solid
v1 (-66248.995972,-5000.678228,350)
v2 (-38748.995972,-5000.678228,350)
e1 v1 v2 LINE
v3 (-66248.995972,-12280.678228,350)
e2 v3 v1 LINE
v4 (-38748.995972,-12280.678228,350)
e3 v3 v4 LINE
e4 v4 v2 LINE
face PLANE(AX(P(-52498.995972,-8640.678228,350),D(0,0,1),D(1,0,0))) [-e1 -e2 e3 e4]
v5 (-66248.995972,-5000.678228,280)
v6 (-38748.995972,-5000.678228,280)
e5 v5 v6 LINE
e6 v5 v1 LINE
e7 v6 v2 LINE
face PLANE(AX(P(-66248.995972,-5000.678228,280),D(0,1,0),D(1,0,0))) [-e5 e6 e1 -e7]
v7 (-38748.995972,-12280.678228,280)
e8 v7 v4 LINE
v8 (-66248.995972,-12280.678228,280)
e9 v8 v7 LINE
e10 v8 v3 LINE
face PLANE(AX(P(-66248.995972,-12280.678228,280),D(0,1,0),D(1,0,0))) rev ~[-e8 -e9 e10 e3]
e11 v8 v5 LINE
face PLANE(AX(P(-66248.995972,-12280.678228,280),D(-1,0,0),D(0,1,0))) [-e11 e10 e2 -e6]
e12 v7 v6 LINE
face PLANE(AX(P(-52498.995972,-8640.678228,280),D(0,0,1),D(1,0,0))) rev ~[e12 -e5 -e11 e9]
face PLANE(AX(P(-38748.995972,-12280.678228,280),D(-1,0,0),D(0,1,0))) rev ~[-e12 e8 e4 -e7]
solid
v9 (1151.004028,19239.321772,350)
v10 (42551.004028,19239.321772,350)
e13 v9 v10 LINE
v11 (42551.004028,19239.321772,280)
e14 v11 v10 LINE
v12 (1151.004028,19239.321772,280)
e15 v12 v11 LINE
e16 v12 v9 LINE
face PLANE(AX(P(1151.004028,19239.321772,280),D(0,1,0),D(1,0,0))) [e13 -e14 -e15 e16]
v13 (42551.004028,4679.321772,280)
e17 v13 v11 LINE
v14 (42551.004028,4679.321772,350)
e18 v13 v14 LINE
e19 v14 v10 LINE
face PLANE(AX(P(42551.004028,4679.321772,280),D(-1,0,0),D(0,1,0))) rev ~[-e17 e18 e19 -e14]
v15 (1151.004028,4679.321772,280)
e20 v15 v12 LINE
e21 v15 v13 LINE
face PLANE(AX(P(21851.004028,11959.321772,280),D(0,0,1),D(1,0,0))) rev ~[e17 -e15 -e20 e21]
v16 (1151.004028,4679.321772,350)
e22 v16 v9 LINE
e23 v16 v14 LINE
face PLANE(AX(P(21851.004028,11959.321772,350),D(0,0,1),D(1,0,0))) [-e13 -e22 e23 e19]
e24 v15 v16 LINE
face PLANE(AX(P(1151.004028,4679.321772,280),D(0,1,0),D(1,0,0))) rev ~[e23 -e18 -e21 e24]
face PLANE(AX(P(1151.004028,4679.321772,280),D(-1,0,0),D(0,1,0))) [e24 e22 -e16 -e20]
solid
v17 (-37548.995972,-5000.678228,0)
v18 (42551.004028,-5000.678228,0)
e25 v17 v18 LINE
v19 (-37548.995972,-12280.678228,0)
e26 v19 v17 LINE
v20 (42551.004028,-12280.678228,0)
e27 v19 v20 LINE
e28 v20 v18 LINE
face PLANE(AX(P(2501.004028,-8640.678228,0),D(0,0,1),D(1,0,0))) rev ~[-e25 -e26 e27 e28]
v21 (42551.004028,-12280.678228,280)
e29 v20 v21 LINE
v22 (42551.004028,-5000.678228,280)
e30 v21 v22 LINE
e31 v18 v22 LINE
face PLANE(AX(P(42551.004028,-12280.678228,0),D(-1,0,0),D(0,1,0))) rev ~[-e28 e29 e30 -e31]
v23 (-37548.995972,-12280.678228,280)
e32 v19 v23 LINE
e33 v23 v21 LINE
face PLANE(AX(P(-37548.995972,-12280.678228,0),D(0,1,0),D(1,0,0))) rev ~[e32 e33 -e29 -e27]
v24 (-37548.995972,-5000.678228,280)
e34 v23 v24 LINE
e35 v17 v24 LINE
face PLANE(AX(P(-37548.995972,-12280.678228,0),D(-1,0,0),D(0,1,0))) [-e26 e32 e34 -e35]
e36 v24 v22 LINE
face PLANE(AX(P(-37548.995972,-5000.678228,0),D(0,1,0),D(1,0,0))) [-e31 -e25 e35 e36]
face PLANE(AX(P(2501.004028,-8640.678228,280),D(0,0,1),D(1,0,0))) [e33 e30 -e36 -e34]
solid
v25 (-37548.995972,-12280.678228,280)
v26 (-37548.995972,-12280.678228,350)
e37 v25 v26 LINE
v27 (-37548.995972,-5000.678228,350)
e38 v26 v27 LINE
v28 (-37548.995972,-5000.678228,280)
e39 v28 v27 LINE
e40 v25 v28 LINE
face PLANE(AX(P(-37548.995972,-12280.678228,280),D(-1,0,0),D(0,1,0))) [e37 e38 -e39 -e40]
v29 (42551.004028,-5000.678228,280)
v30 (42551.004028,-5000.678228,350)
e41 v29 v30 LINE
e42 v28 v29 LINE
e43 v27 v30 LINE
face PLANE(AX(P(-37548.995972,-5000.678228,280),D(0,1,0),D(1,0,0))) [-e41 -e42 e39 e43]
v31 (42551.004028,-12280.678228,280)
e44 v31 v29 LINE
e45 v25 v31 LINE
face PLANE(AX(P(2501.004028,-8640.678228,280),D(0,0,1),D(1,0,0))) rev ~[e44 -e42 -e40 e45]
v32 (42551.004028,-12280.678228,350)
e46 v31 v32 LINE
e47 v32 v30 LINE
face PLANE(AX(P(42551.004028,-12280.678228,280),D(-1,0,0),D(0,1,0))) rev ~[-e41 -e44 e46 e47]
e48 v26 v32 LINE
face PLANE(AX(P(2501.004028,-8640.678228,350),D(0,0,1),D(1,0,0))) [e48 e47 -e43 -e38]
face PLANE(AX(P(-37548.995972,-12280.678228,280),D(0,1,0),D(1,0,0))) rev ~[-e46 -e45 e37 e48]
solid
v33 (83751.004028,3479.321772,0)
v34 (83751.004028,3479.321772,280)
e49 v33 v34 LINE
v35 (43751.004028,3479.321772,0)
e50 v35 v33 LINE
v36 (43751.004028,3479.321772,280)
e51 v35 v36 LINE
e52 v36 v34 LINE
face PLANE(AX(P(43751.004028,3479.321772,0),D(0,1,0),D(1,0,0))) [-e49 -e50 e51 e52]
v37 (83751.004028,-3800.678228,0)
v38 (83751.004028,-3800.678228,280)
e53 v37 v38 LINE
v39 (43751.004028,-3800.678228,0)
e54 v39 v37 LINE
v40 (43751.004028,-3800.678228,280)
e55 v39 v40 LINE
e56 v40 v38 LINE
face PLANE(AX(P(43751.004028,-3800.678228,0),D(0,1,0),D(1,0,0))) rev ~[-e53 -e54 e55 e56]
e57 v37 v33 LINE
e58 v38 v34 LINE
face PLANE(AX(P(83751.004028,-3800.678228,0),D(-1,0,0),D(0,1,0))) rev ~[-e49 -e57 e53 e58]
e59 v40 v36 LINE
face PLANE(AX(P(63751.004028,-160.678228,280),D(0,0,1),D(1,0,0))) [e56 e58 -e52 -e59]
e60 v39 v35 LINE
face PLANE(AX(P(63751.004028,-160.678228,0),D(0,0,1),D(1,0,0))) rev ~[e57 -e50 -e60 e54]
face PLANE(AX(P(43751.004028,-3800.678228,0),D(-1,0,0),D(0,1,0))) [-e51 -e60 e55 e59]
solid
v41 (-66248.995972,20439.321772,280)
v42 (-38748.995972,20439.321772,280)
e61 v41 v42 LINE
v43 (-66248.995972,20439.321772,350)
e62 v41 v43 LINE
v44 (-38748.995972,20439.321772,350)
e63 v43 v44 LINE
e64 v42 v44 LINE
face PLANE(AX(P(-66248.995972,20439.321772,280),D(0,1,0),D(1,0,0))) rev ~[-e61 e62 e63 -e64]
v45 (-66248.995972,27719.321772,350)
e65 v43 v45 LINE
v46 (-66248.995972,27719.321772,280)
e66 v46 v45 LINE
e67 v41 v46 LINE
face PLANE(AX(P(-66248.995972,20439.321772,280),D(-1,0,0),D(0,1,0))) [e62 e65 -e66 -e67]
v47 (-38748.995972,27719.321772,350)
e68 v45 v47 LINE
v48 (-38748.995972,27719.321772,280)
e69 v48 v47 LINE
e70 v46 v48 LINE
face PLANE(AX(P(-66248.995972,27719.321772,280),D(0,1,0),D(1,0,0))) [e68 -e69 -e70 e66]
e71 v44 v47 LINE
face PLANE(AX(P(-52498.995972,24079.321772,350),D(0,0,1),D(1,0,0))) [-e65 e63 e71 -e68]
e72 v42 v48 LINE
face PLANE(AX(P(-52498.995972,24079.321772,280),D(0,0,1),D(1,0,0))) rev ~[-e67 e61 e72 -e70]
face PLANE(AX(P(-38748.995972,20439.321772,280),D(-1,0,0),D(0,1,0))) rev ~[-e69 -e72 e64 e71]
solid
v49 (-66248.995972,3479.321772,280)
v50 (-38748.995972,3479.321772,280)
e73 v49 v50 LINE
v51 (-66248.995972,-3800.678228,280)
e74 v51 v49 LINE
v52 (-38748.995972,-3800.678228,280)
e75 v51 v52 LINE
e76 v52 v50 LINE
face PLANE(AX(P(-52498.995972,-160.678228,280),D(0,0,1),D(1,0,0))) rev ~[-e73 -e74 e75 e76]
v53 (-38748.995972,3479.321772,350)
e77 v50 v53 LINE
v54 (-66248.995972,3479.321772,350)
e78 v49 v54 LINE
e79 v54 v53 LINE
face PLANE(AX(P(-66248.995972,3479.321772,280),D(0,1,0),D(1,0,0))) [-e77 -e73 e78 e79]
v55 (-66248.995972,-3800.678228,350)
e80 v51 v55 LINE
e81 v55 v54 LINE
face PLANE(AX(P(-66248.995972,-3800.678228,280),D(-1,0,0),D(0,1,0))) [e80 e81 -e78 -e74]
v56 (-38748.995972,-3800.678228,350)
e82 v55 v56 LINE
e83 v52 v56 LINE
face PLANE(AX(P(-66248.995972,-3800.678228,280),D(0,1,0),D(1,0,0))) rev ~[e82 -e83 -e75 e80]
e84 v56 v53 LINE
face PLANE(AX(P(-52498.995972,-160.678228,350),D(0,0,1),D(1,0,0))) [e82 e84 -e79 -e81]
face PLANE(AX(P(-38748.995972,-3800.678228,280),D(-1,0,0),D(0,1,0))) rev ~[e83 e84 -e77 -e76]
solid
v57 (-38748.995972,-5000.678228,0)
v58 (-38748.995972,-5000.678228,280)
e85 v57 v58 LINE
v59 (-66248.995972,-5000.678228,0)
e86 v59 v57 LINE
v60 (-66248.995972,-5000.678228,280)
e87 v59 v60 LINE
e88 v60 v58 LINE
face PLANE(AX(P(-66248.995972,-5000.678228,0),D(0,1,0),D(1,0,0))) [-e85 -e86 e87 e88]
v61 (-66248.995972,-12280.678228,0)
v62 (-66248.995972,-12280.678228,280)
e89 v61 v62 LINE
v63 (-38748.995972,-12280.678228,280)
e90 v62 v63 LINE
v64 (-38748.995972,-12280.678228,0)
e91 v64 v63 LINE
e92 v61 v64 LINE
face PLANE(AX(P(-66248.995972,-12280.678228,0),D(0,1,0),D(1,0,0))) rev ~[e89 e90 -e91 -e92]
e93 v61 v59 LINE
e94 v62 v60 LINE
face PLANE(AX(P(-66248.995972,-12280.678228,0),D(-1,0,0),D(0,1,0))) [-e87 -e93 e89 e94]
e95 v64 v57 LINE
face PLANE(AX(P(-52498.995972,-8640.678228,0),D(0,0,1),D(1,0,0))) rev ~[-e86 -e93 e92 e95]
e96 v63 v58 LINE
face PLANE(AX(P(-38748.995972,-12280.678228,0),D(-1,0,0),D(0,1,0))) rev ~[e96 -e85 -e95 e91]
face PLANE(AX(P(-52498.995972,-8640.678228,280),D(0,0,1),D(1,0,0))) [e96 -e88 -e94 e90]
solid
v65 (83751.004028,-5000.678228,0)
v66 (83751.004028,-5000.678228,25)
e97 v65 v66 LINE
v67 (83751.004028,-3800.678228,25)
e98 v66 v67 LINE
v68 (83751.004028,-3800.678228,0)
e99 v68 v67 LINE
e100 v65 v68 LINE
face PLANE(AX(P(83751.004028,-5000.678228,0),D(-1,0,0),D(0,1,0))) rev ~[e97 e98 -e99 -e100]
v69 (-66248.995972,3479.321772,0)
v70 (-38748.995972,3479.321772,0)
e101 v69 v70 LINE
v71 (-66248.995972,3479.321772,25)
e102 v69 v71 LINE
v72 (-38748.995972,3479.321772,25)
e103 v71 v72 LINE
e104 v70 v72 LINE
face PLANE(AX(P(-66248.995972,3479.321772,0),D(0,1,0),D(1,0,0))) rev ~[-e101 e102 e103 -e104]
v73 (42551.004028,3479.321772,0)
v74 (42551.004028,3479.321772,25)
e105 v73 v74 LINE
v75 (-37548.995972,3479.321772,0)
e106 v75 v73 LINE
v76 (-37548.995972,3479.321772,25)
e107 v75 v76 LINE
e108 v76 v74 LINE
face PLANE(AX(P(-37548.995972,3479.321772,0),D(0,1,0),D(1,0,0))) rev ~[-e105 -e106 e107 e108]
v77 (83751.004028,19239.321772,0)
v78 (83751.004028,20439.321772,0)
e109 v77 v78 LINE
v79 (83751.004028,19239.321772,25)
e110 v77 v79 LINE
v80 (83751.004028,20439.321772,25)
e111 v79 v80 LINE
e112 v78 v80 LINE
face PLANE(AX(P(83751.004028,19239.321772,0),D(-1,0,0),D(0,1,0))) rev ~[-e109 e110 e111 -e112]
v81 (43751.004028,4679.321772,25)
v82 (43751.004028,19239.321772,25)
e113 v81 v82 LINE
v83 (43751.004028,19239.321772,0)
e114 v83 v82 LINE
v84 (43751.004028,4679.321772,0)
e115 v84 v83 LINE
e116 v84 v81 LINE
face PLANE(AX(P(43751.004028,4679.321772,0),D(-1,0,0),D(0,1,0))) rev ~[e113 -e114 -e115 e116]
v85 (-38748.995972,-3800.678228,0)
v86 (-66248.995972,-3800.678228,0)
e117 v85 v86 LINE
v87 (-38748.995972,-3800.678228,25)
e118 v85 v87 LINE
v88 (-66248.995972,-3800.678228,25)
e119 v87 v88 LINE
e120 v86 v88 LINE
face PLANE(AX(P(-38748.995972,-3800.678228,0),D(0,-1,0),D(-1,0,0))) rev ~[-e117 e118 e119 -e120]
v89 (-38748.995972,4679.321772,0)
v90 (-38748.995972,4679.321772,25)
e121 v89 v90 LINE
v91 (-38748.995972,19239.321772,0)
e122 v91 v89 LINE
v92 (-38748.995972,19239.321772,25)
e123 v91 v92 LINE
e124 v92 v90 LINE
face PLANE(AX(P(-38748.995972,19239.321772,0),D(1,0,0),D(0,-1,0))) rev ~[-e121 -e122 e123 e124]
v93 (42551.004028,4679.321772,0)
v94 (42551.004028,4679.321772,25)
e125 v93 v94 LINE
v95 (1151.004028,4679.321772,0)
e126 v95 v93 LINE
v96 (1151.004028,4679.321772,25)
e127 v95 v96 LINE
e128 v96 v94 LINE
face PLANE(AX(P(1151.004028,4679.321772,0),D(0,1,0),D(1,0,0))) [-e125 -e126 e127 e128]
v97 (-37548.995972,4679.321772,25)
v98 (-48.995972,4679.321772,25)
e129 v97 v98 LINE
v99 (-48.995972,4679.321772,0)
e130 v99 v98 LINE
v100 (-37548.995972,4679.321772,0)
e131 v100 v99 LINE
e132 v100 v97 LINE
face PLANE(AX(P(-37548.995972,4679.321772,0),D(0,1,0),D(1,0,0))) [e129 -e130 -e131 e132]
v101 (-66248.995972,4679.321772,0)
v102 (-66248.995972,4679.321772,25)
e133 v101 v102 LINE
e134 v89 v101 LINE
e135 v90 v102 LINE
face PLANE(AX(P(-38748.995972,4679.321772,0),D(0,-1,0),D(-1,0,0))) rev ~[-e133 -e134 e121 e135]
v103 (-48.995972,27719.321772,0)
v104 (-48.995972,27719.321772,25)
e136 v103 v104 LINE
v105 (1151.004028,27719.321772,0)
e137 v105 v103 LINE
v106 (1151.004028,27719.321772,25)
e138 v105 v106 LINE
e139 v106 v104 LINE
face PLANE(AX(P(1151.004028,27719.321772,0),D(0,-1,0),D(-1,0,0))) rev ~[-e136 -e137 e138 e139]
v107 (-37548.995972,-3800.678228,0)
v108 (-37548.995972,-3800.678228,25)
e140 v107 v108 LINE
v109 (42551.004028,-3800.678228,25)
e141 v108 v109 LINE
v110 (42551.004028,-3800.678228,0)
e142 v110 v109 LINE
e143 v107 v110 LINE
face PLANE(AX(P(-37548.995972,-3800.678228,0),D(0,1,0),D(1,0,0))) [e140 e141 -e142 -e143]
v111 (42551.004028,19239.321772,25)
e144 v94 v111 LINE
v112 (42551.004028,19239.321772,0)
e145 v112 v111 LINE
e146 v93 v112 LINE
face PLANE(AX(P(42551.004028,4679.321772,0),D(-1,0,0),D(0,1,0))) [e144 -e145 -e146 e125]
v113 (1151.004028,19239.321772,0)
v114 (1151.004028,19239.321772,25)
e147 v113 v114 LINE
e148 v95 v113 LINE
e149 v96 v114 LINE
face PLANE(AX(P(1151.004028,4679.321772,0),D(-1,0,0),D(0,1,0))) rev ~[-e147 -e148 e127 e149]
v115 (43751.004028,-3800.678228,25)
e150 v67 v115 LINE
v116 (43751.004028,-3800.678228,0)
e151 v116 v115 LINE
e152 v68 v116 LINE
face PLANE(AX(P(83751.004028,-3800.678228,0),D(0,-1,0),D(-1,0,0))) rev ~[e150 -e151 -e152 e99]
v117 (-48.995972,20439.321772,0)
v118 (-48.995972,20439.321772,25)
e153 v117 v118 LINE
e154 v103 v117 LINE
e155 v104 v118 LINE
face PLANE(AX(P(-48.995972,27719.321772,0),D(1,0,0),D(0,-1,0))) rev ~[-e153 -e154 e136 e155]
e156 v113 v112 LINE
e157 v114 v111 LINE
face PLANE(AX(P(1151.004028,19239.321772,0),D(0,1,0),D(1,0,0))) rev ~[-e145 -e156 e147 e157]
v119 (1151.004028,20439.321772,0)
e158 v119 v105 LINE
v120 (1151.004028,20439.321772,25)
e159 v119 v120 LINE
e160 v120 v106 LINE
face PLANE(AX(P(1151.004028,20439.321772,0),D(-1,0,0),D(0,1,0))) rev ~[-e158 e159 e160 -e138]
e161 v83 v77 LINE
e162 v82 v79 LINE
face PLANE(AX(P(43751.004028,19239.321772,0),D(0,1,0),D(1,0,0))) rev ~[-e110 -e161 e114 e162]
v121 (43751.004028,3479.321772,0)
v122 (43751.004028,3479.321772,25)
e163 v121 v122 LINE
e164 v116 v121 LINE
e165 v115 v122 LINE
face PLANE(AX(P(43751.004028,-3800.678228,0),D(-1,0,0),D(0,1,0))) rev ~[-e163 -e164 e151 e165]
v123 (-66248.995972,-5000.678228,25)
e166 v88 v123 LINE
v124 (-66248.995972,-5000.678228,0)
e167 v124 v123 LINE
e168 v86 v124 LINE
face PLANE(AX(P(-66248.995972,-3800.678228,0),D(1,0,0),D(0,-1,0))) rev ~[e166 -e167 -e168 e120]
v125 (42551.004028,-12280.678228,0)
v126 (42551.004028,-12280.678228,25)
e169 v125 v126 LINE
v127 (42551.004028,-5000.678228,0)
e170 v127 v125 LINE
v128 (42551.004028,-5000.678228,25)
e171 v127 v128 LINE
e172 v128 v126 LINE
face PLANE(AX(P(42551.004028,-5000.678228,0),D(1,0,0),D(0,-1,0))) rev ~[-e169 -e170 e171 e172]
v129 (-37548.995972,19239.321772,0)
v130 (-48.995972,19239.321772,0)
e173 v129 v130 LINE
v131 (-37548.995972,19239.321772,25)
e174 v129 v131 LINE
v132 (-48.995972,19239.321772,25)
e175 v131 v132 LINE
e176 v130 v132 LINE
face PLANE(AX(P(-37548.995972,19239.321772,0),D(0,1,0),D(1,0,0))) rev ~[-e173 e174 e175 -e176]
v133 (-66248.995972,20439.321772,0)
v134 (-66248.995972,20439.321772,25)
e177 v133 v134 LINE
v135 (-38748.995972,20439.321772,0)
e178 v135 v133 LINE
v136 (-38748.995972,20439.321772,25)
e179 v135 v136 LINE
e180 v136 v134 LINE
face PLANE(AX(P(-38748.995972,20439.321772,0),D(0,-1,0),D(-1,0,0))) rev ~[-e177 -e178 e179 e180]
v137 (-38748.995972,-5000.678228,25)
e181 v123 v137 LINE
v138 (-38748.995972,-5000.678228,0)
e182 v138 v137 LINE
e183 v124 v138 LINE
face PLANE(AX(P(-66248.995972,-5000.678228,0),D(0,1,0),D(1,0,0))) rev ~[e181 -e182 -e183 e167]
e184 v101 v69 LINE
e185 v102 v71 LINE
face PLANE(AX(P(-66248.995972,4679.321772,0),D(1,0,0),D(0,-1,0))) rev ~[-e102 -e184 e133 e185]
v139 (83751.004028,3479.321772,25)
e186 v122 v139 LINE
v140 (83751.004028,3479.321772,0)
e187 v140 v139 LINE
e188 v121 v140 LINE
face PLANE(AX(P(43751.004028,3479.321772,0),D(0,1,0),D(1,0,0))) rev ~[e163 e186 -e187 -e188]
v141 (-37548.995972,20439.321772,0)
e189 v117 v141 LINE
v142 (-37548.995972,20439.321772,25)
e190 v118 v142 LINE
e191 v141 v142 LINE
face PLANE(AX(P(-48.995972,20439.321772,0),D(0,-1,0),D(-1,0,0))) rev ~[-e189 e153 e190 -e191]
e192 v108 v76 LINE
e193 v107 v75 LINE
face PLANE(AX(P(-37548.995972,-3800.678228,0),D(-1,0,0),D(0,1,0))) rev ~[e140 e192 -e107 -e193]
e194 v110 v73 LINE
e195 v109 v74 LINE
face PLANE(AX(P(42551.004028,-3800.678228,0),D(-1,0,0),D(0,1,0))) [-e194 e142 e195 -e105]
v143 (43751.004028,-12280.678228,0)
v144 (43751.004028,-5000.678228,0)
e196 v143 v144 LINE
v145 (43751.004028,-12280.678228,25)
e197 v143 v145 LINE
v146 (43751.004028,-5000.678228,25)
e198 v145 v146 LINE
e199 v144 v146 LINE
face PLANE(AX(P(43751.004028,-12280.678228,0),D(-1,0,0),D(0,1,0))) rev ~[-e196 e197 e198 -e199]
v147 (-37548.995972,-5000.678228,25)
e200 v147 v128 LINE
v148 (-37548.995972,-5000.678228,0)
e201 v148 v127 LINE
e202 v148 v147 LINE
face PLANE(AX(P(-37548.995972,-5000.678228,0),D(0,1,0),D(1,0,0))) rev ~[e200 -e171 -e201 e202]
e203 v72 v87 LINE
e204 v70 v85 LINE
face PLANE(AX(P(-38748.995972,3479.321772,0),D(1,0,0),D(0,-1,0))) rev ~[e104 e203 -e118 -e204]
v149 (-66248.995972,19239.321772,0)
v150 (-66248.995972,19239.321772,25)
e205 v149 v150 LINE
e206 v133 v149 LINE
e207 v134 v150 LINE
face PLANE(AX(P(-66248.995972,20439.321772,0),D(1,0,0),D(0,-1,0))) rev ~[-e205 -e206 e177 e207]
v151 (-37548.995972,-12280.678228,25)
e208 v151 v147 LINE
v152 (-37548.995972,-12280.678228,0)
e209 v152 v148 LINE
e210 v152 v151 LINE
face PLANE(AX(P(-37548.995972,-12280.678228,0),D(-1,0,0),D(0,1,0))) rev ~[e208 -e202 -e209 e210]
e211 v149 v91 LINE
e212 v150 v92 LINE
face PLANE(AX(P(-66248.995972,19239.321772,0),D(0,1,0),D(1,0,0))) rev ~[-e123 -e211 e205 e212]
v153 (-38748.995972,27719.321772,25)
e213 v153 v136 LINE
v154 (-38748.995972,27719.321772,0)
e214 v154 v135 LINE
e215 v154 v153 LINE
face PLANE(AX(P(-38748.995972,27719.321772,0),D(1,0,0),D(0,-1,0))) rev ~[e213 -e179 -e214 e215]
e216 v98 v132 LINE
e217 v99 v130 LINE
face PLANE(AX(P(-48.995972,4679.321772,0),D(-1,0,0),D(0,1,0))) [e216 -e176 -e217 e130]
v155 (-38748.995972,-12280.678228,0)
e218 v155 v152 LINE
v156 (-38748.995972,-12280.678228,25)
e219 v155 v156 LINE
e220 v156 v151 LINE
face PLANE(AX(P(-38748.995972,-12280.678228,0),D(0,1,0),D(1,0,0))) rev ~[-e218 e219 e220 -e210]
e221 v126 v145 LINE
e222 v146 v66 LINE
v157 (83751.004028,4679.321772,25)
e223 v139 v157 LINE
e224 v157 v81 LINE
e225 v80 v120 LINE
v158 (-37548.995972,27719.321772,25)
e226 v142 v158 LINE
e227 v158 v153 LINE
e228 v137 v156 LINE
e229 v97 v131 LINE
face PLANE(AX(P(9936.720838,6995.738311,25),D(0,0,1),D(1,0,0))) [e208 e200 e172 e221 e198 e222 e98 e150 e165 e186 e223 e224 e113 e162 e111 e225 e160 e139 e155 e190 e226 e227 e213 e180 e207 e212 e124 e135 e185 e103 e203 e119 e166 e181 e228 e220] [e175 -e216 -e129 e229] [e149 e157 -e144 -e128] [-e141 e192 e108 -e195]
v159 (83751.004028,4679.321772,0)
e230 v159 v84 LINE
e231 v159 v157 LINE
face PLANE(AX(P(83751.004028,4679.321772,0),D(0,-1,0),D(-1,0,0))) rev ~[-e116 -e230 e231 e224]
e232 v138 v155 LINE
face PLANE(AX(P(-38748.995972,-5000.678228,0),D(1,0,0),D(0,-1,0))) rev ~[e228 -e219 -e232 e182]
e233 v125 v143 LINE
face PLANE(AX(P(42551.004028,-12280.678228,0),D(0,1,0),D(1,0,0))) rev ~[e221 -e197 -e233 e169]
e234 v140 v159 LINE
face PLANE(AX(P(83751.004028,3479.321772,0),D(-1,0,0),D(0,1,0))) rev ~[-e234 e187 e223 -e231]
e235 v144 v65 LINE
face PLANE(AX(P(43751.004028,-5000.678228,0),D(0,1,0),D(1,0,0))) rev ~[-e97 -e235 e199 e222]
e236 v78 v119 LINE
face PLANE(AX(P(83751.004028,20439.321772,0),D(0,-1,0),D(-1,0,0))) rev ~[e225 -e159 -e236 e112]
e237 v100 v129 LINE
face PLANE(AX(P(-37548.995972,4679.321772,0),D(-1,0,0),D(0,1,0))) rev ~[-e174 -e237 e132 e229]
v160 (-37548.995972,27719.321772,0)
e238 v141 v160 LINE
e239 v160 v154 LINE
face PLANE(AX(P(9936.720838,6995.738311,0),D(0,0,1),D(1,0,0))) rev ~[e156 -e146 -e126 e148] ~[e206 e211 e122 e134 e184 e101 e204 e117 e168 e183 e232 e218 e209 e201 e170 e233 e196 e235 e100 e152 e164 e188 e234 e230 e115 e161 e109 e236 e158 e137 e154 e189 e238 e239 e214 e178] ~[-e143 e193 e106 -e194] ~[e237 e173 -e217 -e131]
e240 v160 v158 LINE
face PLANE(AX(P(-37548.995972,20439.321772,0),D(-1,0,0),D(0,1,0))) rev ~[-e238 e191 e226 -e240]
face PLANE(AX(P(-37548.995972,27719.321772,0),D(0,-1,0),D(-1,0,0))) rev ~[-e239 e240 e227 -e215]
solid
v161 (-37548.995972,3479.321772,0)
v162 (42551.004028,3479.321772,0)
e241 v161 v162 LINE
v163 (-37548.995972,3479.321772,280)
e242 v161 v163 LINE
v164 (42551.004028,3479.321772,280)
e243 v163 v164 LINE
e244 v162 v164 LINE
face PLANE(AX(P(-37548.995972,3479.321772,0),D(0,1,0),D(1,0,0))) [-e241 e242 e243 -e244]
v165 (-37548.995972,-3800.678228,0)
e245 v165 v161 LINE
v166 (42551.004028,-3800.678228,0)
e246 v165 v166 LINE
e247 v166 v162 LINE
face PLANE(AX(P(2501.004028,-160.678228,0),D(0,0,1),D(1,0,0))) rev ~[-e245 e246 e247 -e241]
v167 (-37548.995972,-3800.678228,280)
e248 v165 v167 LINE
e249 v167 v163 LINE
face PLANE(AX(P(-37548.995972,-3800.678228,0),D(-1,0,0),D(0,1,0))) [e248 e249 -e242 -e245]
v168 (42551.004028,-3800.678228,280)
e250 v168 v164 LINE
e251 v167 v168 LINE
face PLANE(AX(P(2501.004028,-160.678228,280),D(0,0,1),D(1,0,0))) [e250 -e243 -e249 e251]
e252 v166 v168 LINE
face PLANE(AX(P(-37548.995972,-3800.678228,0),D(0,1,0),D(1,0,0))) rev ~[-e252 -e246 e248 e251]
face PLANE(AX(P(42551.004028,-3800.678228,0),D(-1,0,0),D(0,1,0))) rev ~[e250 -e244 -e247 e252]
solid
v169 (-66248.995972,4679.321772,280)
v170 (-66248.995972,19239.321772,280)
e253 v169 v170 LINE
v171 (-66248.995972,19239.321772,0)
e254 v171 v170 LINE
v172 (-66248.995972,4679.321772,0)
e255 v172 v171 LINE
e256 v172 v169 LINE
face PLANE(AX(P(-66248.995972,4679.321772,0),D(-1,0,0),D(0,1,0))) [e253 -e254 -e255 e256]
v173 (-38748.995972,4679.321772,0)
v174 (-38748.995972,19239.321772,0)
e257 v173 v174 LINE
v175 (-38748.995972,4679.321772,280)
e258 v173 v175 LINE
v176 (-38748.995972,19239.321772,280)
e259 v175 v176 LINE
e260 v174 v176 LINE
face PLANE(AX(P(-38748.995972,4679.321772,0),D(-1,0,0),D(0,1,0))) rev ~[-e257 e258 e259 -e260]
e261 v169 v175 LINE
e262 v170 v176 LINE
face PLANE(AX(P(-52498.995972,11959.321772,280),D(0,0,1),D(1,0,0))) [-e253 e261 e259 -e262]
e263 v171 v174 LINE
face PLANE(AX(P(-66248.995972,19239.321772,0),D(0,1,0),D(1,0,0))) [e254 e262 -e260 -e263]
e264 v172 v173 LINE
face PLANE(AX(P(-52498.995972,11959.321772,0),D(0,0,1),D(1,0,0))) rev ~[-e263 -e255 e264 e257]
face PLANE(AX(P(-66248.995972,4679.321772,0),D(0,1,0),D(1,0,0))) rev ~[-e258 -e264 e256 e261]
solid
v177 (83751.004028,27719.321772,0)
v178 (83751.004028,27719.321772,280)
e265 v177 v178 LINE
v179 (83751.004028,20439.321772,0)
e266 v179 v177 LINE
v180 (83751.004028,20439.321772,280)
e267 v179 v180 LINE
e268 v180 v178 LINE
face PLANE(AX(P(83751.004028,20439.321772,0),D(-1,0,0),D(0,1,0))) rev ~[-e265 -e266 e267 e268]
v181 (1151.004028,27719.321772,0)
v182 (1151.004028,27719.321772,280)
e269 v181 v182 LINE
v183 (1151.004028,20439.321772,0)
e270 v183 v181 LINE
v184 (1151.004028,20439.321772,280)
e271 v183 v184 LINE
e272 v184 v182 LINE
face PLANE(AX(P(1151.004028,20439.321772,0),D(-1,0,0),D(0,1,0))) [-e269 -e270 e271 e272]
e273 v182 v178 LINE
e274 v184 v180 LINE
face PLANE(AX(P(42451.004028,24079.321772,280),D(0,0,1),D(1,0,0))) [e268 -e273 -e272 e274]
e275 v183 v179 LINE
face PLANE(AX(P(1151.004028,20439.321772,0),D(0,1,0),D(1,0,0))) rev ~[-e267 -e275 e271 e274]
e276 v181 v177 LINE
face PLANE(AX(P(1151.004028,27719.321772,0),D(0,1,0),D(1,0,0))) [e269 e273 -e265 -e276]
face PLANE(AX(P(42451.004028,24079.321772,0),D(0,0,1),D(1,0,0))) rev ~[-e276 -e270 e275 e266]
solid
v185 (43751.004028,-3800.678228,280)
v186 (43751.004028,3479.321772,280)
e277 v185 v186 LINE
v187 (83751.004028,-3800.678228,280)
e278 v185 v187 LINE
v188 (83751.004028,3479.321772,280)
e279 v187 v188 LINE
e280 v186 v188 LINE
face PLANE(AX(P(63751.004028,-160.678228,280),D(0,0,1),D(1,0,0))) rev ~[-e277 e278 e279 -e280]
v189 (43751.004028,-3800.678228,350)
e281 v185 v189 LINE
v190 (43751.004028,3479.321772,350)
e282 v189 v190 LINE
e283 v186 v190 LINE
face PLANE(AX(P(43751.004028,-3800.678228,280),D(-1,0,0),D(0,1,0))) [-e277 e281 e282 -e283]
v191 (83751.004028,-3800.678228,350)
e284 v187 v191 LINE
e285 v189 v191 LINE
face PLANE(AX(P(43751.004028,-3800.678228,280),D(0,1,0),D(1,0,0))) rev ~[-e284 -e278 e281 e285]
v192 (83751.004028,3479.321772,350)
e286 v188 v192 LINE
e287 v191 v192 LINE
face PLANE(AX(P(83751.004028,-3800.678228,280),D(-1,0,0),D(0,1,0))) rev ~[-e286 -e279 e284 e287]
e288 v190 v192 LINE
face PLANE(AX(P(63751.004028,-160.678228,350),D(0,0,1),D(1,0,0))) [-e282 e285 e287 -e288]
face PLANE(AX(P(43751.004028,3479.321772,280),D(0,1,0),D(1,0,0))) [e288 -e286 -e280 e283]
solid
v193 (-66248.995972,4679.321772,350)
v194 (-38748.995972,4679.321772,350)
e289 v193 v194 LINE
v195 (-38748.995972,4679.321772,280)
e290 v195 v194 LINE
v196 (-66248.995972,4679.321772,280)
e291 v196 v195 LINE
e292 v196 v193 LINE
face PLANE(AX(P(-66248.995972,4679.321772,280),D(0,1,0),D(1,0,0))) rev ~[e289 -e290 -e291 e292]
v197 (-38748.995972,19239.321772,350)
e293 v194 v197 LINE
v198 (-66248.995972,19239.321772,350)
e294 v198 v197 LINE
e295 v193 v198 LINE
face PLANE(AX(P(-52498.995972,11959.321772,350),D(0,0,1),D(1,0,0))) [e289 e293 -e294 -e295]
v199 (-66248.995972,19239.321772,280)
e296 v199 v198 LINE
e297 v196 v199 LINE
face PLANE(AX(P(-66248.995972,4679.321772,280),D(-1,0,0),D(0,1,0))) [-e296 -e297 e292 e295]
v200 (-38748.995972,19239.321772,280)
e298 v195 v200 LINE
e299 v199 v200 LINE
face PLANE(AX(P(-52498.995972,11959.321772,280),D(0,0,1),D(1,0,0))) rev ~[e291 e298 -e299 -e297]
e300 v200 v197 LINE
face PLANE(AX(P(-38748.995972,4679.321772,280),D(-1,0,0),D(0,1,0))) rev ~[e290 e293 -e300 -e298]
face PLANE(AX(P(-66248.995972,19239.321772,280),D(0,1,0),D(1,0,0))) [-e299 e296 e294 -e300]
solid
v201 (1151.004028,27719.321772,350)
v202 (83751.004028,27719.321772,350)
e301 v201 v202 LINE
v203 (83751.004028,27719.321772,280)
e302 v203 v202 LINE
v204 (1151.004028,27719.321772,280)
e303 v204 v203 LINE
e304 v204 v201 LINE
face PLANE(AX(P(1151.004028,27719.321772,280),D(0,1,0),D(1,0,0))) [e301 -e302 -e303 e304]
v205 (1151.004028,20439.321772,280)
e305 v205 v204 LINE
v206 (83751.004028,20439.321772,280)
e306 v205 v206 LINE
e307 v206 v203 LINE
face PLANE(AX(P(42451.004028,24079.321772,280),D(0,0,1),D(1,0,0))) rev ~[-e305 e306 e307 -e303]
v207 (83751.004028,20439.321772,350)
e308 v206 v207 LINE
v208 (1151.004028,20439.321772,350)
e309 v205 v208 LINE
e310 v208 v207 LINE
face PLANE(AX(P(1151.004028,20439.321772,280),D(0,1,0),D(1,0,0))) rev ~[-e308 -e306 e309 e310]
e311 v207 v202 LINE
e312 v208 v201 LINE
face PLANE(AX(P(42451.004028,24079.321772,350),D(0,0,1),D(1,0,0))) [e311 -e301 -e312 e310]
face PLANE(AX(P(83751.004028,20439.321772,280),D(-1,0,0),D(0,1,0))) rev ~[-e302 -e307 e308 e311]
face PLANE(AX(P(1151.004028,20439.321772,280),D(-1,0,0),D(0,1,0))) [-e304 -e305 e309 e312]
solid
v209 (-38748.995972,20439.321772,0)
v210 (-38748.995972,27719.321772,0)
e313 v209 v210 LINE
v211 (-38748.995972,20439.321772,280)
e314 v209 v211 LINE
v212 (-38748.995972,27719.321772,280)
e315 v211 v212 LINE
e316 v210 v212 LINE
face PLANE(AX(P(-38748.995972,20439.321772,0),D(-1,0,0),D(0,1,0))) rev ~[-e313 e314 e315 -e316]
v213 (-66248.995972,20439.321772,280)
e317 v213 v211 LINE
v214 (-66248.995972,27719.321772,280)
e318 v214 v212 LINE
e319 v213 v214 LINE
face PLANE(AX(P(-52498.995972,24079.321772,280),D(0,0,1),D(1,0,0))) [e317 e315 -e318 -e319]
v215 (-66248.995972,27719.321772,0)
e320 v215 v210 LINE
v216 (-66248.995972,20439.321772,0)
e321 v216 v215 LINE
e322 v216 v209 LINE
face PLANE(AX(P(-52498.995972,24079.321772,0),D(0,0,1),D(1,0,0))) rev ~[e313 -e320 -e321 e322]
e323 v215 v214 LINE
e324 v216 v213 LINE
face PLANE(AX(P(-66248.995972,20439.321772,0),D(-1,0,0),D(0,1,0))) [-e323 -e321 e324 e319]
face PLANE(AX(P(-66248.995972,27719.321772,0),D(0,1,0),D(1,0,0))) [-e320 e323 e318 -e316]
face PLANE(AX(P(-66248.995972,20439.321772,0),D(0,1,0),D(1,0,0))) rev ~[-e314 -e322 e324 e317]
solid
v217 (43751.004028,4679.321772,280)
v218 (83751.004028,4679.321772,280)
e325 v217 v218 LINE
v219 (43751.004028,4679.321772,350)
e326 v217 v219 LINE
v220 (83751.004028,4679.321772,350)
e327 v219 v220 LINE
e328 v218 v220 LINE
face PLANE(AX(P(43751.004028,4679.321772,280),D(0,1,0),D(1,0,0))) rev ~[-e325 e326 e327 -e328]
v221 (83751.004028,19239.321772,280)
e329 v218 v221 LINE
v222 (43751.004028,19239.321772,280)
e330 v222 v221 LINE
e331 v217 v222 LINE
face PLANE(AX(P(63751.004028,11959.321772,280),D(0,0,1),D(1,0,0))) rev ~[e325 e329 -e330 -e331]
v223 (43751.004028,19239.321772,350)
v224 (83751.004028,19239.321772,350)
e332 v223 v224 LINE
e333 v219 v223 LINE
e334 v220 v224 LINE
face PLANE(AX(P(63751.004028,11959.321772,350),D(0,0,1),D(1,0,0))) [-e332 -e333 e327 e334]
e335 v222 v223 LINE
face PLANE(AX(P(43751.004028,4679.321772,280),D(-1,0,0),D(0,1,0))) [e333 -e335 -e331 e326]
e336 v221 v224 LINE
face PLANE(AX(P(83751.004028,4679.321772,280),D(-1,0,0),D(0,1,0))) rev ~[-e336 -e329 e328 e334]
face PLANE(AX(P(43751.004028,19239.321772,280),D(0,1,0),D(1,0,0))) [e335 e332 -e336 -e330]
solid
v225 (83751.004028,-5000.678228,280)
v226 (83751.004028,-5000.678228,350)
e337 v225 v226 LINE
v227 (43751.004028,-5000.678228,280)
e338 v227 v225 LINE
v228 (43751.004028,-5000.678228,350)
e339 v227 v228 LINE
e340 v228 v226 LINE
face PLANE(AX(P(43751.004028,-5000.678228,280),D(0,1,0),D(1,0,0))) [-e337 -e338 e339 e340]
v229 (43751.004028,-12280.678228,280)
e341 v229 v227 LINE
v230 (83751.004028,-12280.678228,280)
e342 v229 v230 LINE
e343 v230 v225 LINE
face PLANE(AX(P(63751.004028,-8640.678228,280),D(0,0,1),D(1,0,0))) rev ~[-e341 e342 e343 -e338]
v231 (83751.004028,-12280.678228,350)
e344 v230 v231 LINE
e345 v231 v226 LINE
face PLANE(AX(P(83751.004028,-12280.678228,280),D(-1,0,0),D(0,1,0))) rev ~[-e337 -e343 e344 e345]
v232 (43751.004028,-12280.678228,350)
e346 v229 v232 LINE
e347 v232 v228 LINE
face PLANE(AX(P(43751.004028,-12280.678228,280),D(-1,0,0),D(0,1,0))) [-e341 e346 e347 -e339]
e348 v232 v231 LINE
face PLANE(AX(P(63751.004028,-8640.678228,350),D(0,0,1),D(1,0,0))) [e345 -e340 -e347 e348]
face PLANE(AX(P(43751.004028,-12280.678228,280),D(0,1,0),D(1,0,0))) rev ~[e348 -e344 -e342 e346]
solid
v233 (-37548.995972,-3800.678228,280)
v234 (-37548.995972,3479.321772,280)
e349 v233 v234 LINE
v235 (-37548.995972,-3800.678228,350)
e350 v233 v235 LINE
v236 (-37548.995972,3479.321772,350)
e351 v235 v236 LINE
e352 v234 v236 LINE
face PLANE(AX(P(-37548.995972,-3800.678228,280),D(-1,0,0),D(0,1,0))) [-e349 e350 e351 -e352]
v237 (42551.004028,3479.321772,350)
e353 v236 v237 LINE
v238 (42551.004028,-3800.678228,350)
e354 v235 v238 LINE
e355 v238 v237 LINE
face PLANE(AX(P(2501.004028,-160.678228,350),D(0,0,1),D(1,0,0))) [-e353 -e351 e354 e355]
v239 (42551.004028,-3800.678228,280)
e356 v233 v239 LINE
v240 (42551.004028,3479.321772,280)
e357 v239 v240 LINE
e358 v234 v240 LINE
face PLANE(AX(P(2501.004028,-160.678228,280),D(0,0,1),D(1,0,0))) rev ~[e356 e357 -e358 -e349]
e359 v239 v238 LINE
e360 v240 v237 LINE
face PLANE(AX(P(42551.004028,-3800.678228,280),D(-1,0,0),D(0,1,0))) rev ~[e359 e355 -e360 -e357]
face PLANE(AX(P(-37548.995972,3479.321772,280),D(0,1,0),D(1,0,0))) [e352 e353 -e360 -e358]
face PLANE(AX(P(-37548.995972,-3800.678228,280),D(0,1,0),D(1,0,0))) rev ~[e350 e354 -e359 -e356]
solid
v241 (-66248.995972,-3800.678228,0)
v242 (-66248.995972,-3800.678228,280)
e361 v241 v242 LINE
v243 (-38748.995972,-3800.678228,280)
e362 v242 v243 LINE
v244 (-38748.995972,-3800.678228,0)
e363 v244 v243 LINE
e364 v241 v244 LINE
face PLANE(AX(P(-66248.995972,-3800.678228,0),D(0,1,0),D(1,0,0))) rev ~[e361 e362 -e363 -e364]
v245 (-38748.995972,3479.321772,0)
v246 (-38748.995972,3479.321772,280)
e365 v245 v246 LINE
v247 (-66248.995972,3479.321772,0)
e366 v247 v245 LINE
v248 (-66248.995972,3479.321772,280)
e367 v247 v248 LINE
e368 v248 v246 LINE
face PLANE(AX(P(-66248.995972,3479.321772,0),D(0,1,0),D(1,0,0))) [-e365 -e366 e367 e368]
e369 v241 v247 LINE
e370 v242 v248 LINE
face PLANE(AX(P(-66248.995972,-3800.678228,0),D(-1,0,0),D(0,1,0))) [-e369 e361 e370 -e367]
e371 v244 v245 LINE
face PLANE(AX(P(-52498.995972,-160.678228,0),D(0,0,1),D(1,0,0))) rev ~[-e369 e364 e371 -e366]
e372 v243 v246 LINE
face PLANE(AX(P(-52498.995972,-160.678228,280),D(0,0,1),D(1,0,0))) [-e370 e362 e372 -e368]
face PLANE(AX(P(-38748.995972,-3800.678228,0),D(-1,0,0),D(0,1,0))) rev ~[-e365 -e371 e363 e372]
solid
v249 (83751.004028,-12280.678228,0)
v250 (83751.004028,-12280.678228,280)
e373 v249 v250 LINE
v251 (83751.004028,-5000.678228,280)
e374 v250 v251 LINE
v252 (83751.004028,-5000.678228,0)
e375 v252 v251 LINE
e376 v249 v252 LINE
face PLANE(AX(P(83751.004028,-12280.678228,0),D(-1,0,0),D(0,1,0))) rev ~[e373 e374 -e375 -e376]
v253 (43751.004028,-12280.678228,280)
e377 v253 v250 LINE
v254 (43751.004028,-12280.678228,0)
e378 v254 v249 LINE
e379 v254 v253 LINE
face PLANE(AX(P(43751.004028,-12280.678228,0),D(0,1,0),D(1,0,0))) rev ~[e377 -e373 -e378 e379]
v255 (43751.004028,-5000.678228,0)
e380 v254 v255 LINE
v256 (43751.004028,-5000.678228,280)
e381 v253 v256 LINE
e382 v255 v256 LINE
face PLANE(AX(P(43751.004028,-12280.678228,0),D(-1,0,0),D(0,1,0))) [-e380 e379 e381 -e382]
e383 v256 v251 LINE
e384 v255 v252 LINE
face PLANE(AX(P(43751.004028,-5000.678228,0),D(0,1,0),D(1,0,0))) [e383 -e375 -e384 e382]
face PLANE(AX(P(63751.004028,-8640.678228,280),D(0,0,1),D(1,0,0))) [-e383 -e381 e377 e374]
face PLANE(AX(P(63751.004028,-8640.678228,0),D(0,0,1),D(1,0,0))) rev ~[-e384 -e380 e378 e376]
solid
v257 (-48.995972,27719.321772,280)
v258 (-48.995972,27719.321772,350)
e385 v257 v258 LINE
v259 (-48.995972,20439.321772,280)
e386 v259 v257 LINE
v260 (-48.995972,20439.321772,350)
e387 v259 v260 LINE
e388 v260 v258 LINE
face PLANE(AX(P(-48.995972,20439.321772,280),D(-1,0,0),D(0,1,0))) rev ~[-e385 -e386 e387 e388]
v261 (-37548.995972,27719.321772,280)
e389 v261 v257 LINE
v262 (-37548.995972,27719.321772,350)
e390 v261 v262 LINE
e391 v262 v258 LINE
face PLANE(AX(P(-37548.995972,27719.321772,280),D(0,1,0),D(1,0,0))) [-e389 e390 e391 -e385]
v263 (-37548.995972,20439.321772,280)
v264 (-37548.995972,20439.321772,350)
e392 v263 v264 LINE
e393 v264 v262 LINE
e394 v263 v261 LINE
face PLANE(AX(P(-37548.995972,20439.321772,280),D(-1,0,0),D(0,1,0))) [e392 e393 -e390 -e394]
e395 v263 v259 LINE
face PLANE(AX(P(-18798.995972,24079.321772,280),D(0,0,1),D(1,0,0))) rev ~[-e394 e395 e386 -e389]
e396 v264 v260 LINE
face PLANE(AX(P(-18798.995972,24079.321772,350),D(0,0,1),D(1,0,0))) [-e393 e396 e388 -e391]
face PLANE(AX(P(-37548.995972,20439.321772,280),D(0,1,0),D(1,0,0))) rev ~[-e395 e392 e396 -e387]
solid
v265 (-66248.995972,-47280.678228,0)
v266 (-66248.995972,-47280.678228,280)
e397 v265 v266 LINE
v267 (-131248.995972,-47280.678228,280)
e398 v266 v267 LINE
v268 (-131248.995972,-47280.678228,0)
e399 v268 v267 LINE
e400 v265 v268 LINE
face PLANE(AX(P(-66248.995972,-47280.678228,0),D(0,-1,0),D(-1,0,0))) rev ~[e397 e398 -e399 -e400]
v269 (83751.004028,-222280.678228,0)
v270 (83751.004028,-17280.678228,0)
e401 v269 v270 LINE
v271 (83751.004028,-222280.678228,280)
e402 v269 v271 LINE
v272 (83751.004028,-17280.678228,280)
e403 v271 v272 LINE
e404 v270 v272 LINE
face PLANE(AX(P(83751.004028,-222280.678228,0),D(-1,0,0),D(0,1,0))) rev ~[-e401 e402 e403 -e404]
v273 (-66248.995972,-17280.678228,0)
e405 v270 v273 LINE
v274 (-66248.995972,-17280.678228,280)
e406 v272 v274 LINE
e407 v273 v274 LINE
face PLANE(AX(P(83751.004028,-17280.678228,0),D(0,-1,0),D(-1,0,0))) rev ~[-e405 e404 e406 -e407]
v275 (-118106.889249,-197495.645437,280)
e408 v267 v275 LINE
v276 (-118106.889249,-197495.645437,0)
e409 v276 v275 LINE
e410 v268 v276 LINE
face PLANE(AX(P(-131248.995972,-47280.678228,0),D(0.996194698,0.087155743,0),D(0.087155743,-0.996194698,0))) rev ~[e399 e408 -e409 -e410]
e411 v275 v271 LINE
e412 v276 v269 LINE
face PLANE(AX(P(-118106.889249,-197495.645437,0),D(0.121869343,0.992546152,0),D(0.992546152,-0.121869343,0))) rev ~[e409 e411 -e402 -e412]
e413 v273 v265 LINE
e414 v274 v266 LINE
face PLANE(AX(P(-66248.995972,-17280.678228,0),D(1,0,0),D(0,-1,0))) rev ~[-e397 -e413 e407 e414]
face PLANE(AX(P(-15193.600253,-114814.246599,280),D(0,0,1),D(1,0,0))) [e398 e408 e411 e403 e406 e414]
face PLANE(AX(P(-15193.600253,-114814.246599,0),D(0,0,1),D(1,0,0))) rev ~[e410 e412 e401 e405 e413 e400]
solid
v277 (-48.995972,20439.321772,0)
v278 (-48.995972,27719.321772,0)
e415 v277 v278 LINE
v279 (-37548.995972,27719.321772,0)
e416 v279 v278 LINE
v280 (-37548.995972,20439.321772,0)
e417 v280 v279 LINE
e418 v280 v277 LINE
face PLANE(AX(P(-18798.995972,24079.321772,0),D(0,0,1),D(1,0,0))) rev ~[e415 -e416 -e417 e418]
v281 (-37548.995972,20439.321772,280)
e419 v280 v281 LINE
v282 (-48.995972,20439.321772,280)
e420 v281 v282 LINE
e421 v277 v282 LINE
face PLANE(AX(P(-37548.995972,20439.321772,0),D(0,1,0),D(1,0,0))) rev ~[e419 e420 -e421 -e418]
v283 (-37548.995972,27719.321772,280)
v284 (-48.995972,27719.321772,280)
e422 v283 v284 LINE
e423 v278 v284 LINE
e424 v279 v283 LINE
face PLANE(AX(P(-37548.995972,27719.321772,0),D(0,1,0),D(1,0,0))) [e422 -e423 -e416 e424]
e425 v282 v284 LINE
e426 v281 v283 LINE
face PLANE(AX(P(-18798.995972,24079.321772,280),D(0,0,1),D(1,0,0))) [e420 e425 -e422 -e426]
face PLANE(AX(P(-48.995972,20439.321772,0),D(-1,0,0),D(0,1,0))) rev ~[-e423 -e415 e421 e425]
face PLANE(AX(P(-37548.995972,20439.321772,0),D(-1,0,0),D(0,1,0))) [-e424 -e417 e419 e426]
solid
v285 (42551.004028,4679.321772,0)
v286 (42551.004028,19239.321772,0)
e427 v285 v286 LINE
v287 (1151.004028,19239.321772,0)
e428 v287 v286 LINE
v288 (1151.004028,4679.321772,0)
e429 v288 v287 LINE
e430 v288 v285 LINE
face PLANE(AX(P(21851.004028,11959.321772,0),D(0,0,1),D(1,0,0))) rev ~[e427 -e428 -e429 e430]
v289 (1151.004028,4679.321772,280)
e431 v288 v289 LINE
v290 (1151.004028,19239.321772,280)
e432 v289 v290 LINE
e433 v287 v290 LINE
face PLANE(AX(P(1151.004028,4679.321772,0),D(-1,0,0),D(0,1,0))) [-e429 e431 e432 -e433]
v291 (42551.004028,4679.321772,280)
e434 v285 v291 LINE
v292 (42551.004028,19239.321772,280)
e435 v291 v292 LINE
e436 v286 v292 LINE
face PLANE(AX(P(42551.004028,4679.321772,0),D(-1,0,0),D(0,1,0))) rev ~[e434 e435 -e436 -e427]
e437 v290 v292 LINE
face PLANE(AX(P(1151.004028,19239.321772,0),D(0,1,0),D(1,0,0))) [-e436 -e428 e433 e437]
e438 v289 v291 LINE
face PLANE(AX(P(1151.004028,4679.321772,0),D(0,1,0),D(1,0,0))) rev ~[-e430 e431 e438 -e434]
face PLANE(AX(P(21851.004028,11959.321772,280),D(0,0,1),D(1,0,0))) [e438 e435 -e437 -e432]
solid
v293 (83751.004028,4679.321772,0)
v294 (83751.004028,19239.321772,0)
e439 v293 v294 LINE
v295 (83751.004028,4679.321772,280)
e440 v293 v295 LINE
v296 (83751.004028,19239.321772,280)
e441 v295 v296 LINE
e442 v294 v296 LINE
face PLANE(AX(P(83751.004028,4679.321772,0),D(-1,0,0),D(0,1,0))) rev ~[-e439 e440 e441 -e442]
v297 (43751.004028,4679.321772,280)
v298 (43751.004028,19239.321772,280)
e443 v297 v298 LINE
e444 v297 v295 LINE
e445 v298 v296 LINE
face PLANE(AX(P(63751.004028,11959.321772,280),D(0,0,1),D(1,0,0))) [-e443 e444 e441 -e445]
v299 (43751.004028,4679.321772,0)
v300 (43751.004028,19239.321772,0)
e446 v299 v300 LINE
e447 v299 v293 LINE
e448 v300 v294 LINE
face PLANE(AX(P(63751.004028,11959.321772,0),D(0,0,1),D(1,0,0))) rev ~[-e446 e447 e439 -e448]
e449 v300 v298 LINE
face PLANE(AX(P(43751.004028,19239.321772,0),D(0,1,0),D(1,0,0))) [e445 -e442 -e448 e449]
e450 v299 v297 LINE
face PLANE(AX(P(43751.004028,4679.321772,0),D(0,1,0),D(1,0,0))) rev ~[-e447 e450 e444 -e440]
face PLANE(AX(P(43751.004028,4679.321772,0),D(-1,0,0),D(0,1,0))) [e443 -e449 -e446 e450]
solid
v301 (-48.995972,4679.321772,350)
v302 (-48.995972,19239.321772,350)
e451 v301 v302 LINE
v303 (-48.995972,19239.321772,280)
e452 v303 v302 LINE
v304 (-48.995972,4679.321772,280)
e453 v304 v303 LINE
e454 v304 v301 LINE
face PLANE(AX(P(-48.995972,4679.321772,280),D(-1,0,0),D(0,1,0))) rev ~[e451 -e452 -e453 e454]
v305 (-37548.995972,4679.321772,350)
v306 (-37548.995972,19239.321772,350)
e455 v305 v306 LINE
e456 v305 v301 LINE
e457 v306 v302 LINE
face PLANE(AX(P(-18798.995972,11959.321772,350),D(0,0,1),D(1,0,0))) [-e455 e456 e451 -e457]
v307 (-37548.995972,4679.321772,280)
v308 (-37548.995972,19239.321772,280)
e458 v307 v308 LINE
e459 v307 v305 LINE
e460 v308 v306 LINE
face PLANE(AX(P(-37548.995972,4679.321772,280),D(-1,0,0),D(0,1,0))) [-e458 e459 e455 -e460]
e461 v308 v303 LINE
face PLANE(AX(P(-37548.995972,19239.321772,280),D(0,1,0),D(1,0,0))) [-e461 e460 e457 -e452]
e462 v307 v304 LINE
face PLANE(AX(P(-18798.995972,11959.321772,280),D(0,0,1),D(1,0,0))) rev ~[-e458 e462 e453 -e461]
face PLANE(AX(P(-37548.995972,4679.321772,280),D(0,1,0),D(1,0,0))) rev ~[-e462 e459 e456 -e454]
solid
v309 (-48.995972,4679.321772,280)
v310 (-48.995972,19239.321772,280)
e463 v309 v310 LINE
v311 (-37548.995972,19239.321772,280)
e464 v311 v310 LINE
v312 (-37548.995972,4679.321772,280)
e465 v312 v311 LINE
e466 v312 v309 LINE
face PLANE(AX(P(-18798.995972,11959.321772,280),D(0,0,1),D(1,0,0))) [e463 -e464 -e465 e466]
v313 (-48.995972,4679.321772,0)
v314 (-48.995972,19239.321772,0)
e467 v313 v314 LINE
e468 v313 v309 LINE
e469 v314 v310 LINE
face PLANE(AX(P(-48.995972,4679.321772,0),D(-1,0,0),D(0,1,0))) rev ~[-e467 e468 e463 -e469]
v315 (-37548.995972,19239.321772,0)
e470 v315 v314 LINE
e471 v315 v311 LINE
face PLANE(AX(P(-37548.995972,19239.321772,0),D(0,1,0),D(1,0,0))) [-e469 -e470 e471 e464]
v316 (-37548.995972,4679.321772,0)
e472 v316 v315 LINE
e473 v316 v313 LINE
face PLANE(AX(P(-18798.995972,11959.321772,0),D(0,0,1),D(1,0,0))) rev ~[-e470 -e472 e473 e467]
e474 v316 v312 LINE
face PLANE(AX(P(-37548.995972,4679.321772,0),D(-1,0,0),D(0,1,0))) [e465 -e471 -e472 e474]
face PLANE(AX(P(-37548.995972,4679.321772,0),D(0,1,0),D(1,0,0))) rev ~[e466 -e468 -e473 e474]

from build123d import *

# Parameters (mm, degrees)
F0_W     = 80100
F0_H     = 7280
F0_W_2   = 37500
F0_H_2   = 14560
F0_W_3   = 41400
F3_DEPTH = 25
F4_START = 280
F0_W_4   = 27500
F4_DEPTH = 70
F0_W_5   = 40000
F5_START = 280
F5_DEPTH = 70
F6_START = 280
F6_DEPTH = 70
F0_W_6   = 82600
F7_START = 280
F7_DEPTH = 70
F8_DEPTH = 280
F9_DEPTH = 280


# Not quite as in the source:
# - a feature names something its author has since deleted; it is built from what else it names


with BuildPart() as f3:
    # F0 (on Top) → F3 (new body)
    with BuildSketch(Plane.XY):
        Polygon((1151.0040283203, 20439.3217722573), (1151.0040283203, 27719.3217722572), (-48.9959716797, 27719.3217722572), (-48.9959716797, 20439.3217722573), (-37548.9959716797, 20439.3217722573), (-37548.9959716797, 27719.3217722572), (-38748.9959716797, 27719.3217722572), (-38748.9959716797, 20439.3217722573), (-66248.9959716797, 20439.3217722573), (-66248.9959716797, 19239.3217722572), (-38748.9959716797, 19239.3217722572), (-38748.9959716797, 4679.3217722572), (-66248.9959716797, 4679.3217722572), (-66248.9959716797, 3479.3217722572), (-38748.9959716797, 3479.3217722572), (-38748.9959716797, -3800.6782277428), (-66248.9959716797, -3800.6782277428), (-66248.9959716797, -5000.6782277428), (-38748.9959716797, -5000.6782277428), (-38748.9959716797, -12280.6782277428), (-37548.9959716797, -12280.6782277428), (-37548.9959716797, -5000.6782277428), (42551.0040283203, -5000.6782277428), (42551.0040283203, -12280.6782277428), (43751.0040283203, -12280.6782277428), (43751.0040283203, -5000.6782277428), (83751.0040283203, -5000.6782277428), (83751.0040283203, -3800.6782277427), (43751.0040283203, -3800.6782277427), (43751.0040283203, 3479.3217722572), (83751.0040283203, 3479.3217722572), (83751.0040283203, 4679.3217722573), (43751.0040283203, 4679.3217722573), (43751.0040283203, 19239.3217722572), (83751.0040283203, 19239.3217722573), (83751.0040283203, 20439.3217722573), align=None)
        with Locations((2501.0040283203, -160.6782277428)):
            Rectangle(F0_W, F0_H, mode=Mode.SUBTRACT)
        with Locations((-18798.9959716797, 11959.3217722572)):
            Rectangle(F0_W_2, F0_H_2, mode=Mode.SUBTRACT)
        with Locations((21851.0040283203, 11959.3217722572)):
            Rectangle(F0_W_3, F0_H_2, mode=Mode.SUBTRACT)
    extrude(amount=F3_DEPTH)


with BuildPart() as f4:
    # F0 (on Top) → F4 (new body)
    with BuildSketch(Plane.XY.offset(F4_START)):
        with Locations((-52498.9959716797, -8640.6782277428)):
            Rectangle(F0_W_4, F0_H)
    extrude(amount=F4_DEPTH)


with BuildPart() as f4b:
    # F0 (on Top) → F4, piece 2 (new body)
    with BuildSketch(Plane.XY.offset(F4_START)):
        with Locations((-18798.9959716797, 24079.3217722572)):
            Rectangle(F0_W_2, F0_H)
    extrude(amount=F4_DEPTH)


with BuildPart() as f4c:
    # F0 (on Top) → F4, piece 3 (new body)
    with BuildSketch(Plane.XY.offset(F4_START)):
        with Locations((63751.0040283203, 11959.3217722573)):
            Rectangle(F0_W_5, F0_H_2)
    extrude(amount=F4_DEPTH)


with BuildPart() as f5:
    # F0 (on Top) → F5 (new body)
    with BuildSketch(Plane.XY.offset(F5_START)):
        with Locations((2501.0040283203, -8640.6782277428)):
            Rectangle(F0_W, F0_H)
    extrude(amount=F5_DEPTH)


with BuildPart() as f5b:
    # F0 (on Top) → F5, piece 2 (new body)
    with BuildSketch(Plane.XY.offset(F5_START)):
        with Locations((-52498.9959716797, 24079.3217722572)):
            Rectangle(F0_W_4, F0_H)
    extrude(amount=F5_DEPTH)


with BuildPart() as f6:
    # F0 (on Top) → F6 (new body)
    with BuildSketch(Plane.XY.offset(F6_START)):
        with Locations((2501.0040283203, -160.6782277428)):
            Rectangle(F0_W, F0_H)
    extrude(amount=F6_DEPTH)


with BuildPart() as f6b:
    # F0 (on Top) → F6, piece 2 (new body)
    with BuildSketch(Plane.XY.offset(F6_START)):
        with Locations((42451.0040283203, 24079.3217722573)):
            Rectangle(F0_W_6, F0_H)
    extrude(amount=F6_DEPTH)


with BuildPart() as f7:
    # F0 (on Top) → F7 (new body)
    with BuildSketch(Plane.XY.offset(F7_START)):
        with Locations((63751.0040283203, -8640.6782277428)):
            Rectangle(F0_W_5, F0_H)
    extrude(amount=F7_DEPTH)


with BuildPart() as f7b:
    # F0 (on Top) → F7, piece 2 (new body)
    with BuildSketch(Plane.XY.offset(F7_START)):
        with Locations((63751.0040283203, -160.6782277427)):
            Rectangle(F0_W_5, F0_H)
    extrude(amount=F7_DEPTH)


with BuildPart() as f7c:
    # F0 (on Top) → F7, piece 3 (new body)
    with BuildSketch(Plane.XY.offset(F7_START)):
        with Locations((21851.0040283203, 11959.3217722573)):
            Rectangle(F0_W_3, F0_H_2)
    extrude(amount=F7_DEPTH)


with BuildPart() as f7d:
    # F0 (on Top) → F7, piece 4 (new body)
    with BuildSketch(Plane.XY.offset(F7_START)):
        with Locations((-18798.9959716797, 11959.3217722572)):
            Rectangle(F0_W_2, F0_H_2)
    extrude(amount=F7_DEPTH)


with BuildPart() as f7e:
    # F0 (on Top) → F7, piece 5 (new body)
    with BuildSketch(Plane.XY.offset(F7_START)):
        with Locations((-52498.9959716797, 11959.3217722572)):
            Rectangle(F0_W_4, F0_H_2)
    extrude(amount=F7_DEPTH)


with BuildPart() as f7f:
    # F0 (on Top) → F7, piece 6 (new body)
    with BuildSketch(Plane.XY.offset(F7_START)):
        with Locations((-52498.9959716797, -160.6782277428)):
            Rectangle(F0_W_4, F0_H)
    extrude(amount=F7_DEPTH)


with BuildPart() as f8:
    # F0 (on Top) → F8 (new body)
    with BuildSketch(Plane.XY):
        with Locations((42451.0040283203, 24079.3217722573)):
            Rectangle(F0_W_6, F0_H)
    extrude(amount=F8_DEPTH)


with BuildPart() as f8b:
    # F0 (on Top) → F8, piece 2 (new body)
    with BuildSketch(Plane.XY):
        with Locations((63751.0040283203, 11959.3217722573)):
            Rectangle(F0_W_5, F0_H_2)
    extrude(amount=F8_DEPTH)


with BuildPart() as f8c:
    # F0 (on Top) → F8, piece 3 (new body)
    with BuildSketch(Plane.XY):
        with Locations((21851.0040283203, 11959.3217722573)):
            Rectangle(F0_W_3, F0_H_2)
    extrude(amount=F8_DEPTH)


with BuildPart() as f8d:
    # F0 (on Top) → F8, piece 4 (new body)
    with BuildSketch(Plane.XY):
        with Locations((-18798.9959716797, 24079.3217722572)):
            Rectangle(F0_W_2, F0_H)
    extrude(amount=F8_DEPTH)


with BuildPart() as f8e:
    # F0 (on Top) → F8, piece 5 (new body)
    with BuildSketch(Plane.XY):
        with Locations((-52498.9959716797, 24079.3217722572)):
            Rectangle(F0_W_4, F0_H)
    extrude(amount=F8_DEPTH)


with BuildPart() as f8f:
    # F0 (on Top) → F8, piece 6 (new body)
    with BuildSketch(Plane.XY):
        with Locations((-52498.9959716797, 11959.3217722572)):
            Rectangle(F0_W_4, F0_H_2)
    extrude(amount=F8_DEPTH)


with BuildPart() as f8g:
    # F0 (on Top) → F8, piece 7 (new body)
    with BuildSketch(Plane.XY):
        with Locations((-52498.9959716797, -160.6782277428)):
            Rectangle(F0_W_4, F0_H)
    extrude(amount=F8_DEPTH)


with BuildPart() as f8h:
    # F0 (on Top) → F8, piece 8 (new body)
    with BuildSketch(Plane.XY):
        with Locations((-52498.9959716797, -8640.6782277428)):
            Rectangle(F0_W_4, F0_H)
    extrude(amount=F8_DEPTH)


with BuildPart() as f8i:
    # F0 (on Top) → F8, piece 9 (new body)
    with BuildSketch(Plane.XY):
        with Locations((2501.0040283203, -8640.6782277428)):
            Rectangle(F0_W, F0_H)
    extrude(amount=F8_DEPTH)


with BuildPart() as f8j:
    # F0 (on Top) → F8, piece 10 (new body)
    with BuildSketch(Plane.XY):
        with Locations((2501.0040283203, -160.6782277428)):
            Rectangle(F0_W, F0_H)
    extrude(amount=F8_DEPTH)


with BuildPart() as f8k:
    # F0 (on Top) → F8, piece 11 (new body)
    with BuildSketch(Plane.XY):
        with Locations((63751.0040283203, -160.6782277427)):
            Rectangle(F0_W_5, F0_H)
    extrude(amount=F8_DEPTH)


with BuildPart() as f8l:
    # F0 (on Top) → F8, piece 12 (new body)
    with BuildSketch(Plane.XY):
        with Locations((63751.0040283203, -8640.6782277428)):
            Rectangle(F0_W_5, F0_H)
    extrude(amount=F8_DEPTH)


with BuildPart() as f8m:
    # F0 (on Top) → F8, piece 13 (new body)
    with BuildSketch(Plane.XY):
        with Locations((-18798.9959716797, 11959.3217722572)):
            Rectangle(F0_W_2, F0_H_2)
    extrude(amount=F8_DEPTH)


with BuildPart() as f9:
    # F2 (on Top) → F9 (new body)
    with BuildSketch(Plane.XY):
        Polygon((83751.0040283203, -17280.6782277427), (-66248.9959716797, -17280.6782277428), (-66248.9959716797, -47280.6782277428), (-131248.9959716797, -47280.6782277428), (-118106.8892489593, -197495.6454369067), (83751.0040283203, -222280.6782277427), align=None)
    extrude(amount=F9_DEPTH)


solid = Compound([f3.part, f4.part, f4b.part, f4c.part, f5.part, f5b.part, f6.part, f6b.part, f7.part, f7b.part, f7c.part, f7d.part, f7e.part, f7f.part, f8.part, f8b.part, f8c.part, f8d.part, f8e.part, f8f.part, f8g.part, f8h.part, f8i.part, f8j.part, f8k.part, f8l.part, f8m.part, f9.part])
